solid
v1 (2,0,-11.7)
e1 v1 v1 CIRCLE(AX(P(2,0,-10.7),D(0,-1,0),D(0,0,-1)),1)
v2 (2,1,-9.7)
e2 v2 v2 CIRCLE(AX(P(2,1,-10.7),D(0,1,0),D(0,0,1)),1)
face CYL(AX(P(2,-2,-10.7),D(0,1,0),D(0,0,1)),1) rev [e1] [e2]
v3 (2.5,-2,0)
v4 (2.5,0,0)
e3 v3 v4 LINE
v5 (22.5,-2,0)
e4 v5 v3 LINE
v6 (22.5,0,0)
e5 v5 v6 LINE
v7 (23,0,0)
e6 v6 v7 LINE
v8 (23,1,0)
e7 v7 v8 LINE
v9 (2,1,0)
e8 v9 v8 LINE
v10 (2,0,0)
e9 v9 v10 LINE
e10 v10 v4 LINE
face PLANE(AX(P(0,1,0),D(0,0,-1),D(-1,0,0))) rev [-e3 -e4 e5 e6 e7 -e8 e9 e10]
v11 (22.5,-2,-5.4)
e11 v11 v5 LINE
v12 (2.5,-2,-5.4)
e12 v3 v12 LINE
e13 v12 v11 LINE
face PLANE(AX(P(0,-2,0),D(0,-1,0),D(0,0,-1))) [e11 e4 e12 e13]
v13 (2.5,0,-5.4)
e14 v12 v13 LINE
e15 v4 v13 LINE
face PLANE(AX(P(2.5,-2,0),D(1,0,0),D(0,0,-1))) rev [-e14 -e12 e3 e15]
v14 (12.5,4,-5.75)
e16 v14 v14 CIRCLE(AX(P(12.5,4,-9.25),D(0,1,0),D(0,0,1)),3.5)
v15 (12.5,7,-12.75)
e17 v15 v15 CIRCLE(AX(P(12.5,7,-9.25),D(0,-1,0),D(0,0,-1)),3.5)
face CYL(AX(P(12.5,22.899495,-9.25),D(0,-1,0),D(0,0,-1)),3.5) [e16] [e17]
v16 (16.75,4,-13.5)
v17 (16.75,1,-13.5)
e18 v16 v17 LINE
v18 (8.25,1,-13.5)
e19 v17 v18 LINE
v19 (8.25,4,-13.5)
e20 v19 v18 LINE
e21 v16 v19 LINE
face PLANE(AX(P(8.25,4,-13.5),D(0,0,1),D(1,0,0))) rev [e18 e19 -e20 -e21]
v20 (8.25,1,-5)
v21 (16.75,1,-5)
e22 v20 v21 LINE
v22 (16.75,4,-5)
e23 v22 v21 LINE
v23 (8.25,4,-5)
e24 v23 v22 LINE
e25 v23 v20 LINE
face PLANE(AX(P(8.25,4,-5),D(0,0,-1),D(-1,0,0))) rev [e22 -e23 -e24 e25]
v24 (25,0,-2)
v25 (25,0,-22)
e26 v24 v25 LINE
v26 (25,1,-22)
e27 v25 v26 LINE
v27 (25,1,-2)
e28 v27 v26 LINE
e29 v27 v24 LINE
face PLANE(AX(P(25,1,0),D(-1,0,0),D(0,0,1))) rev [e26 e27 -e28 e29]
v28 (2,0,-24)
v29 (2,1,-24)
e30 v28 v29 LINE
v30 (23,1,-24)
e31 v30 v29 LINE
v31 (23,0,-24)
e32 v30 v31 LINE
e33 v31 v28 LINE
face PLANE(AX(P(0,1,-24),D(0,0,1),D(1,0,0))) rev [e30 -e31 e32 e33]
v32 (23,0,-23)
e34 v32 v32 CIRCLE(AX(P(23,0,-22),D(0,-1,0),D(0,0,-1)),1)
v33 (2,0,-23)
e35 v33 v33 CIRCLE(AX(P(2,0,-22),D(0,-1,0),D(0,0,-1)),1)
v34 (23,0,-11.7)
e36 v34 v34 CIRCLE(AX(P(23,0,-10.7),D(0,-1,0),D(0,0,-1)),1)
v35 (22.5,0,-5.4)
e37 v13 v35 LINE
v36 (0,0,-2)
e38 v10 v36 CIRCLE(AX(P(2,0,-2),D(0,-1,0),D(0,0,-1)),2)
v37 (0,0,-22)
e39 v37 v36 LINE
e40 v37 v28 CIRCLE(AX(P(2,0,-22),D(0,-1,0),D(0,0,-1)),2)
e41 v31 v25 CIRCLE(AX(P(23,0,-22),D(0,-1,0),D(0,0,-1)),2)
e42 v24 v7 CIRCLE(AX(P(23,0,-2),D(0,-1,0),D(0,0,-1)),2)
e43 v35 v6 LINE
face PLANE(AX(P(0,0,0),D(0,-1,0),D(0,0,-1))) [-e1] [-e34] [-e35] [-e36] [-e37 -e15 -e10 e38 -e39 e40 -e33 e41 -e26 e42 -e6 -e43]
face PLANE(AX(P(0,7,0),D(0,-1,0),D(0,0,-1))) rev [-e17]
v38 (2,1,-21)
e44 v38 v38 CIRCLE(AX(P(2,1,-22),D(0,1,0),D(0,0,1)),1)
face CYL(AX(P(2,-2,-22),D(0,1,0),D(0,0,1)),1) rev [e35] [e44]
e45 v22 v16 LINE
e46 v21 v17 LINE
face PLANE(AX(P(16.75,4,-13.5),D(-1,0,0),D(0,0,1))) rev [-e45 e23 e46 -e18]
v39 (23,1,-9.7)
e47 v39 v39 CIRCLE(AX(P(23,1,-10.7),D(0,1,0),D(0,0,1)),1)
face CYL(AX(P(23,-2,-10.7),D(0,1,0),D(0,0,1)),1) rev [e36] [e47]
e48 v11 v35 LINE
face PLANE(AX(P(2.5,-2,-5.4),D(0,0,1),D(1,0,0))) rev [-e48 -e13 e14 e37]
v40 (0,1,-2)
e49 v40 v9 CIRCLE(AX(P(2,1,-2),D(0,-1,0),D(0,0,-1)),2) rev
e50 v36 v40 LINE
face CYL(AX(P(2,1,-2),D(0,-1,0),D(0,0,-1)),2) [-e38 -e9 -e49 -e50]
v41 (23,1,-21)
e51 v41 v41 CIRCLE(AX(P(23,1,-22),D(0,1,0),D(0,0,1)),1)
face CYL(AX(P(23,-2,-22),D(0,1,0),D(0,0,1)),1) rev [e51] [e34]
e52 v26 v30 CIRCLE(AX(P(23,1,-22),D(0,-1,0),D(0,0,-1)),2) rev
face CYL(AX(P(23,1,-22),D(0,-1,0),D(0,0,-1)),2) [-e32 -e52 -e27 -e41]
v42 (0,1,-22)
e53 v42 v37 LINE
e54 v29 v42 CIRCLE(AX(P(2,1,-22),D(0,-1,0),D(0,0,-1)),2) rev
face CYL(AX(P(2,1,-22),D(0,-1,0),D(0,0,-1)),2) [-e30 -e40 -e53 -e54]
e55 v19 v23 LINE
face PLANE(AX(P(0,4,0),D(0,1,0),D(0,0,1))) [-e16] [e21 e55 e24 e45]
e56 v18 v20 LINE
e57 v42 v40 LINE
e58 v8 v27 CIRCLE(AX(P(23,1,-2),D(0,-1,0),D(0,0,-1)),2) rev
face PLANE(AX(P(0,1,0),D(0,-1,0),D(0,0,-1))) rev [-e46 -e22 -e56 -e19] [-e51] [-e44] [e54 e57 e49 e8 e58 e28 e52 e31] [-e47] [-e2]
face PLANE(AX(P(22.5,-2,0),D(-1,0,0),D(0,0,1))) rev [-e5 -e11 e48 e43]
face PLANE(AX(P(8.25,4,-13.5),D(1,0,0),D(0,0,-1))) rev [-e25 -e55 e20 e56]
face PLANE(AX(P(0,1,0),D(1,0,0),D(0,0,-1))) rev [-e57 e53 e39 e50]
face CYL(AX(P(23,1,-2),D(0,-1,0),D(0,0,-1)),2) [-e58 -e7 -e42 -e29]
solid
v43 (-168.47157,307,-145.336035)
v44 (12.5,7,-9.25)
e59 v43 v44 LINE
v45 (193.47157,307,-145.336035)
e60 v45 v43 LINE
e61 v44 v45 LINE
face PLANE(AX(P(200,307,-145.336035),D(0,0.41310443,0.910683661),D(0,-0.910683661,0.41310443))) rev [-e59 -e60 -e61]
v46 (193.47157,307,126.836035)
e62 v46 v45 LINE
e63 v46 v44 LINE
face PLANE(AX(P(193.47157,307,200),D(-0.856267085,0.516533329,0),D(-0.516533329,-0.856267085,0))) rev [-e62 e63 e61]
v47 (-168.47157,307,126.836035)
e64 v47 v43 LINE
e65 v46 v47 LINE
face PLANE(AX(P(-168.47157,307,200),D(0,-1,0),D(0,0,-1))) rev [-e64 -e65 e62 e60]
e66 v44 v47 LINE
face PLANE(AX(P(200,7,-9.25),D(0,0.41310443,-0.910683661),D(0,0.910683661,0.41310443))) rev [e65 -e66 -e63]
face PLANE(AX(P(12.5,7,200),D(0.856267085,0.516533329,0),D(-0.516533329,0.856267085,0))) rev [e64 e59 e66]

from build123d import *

# Parameters (mm, degrees)
SKETCH1_W           = 25
SKETCH1_H           = 24
BOSS_EXTRUDE1_DEPTH = 1
SKETCH2_W           = 8.5
SKETCH2_H           = 8.5
BOSS_EXTRUDE2_DEPTH = 3
SKETCH3_R           = 3.5
BOSS_EXTRUDE3_DEPTH = 3
SKETCH4_W           = 20
SKETCH4_H           = 5.4
BOSS_EXTRUDE4_DEPTH = 2
SKETCH5_R           = 1
CUT_EXTRUDE1_DEPTH  = 36.17101079
FILLET1_R           = 2
BOSS_EXTRUDE5_DEPTH = 200
BOSS_EXTRUDE6_DEPTH = 200


with BuildPart() as part:
    # Sketch1 → Boss-Extrude1 (new body)
    with BuildSketch(Plane(origin=(0, 0, 0), x_dir=(1, 0, 0), z_dir=(0, 1, 0))):
        with Locations((12.5, 12)):
            Rectangle(SKETCH1_W, SKETCH1_H)
    extrude(amount=BOSS_EXTRUDE1_DEPTH)

    # Sketch2 → Boss-Extrude2 (add)
    with BuildSketch(Plane(origin=(0, 1, 0), x_dir=(1, 0, 0), z_dir=(0, 1, 0))):
        with Locations((12.5, 9.25)):
            Rectangle(SKETCH2_W, SKETCH2_H)
    extrude(amount=BOSS_EXTRUDE2_DEPTH)

    # Sketch3 → Boss-Extrude3 (add)
    with BuildSketch(Plane(origin=(0, 4, 0), x_dir=(1, 0, 0), z_dir=(0, 1, 0))):
        with Locations(Location((12.5, 9.25, 0), (0, 0, 90))):
            Circle(SKETCH3_R)
    extrude(amount=BOSS_EXTRUDE3_DEPTH)

    # Sketch4 → Boss-Extrude4 (add)
    with BuildSketch(Plane.XZ):
        with Locations((12.5, -2.7)):
            Rectangle(SKETCH4_W, SKETCH4_H)
    extrude(amount=BOSS_EXTRUDE4_DEPTH)

    # Sketch5 → Cut-Extrude1 (cut, through all)
    with BuildSketch(Plane(origin=(0, 1, 0), x_dir=(1, 0, 0), z_dir=(0, 1, 0))):
        with Locations(Location((2, 10.7, 0), (0, 0, 270))):
            Circle(SKETCH5_R)
        with Locations(Location((2, 22, 0), (0, 0, 270))):
            Circle(SKETCH5_R)
        with Locations(Location((23, 22, 0), (0, 0, 270))):
            Circle(SKETCH5_R)
        with Locations(Location((23, 10.7, 0), (0, 0, 270))):
            Circle(SKETCH5_R)
    extrude(amount=-CUT_EXTRUDE1_DEPTH, mode=Mode.SUBTRACT)

    # Fillet1
    fillet1_edges = [part.edges().sort_by_distance(p)[0] for p in [
        (0, 0.5, -24),
        (25, 0.5, -24),
        (25, 0.5, 0),
        (0, 0.5, 0),
    ]]
    fillet(fillet1_edges, radius=FILLET1_R)


with BuildPart() as body_2:
    # Sketch6 → Boss-Extrude5 (new, symmetric)
    with BuildSketch(Plane(origin=(0, 0, 0), x_dir=(0, 0, -1), z_dir=(1, 0, 0))):
        Polygon((9.25, 7), (-126.836035449, 307), (145.336035449, 307), align=None)
    extrude(amount=BOSS_EXTRUDE5_DEPTH, both=True)


with BuildPart() as body_3:
    # Sketch8 → Boss-Extrude6 (new, symmetric)
    with BuildSketch(Plane.XY):
        Polygon((12.5, 7), (-168.471570024, 307), (193.471570024, 307), align=None)
    extrude(amount=BOSS_EXTRUDE6_DEPTH, both=True)

    # Intersect1: read off the stored shape, not the designer's step
    # Intersect1: intersect body 2
    add(body_2.part, mode=Mode.INTERSECT)


solid = Compound([part.part, body_3.part])
